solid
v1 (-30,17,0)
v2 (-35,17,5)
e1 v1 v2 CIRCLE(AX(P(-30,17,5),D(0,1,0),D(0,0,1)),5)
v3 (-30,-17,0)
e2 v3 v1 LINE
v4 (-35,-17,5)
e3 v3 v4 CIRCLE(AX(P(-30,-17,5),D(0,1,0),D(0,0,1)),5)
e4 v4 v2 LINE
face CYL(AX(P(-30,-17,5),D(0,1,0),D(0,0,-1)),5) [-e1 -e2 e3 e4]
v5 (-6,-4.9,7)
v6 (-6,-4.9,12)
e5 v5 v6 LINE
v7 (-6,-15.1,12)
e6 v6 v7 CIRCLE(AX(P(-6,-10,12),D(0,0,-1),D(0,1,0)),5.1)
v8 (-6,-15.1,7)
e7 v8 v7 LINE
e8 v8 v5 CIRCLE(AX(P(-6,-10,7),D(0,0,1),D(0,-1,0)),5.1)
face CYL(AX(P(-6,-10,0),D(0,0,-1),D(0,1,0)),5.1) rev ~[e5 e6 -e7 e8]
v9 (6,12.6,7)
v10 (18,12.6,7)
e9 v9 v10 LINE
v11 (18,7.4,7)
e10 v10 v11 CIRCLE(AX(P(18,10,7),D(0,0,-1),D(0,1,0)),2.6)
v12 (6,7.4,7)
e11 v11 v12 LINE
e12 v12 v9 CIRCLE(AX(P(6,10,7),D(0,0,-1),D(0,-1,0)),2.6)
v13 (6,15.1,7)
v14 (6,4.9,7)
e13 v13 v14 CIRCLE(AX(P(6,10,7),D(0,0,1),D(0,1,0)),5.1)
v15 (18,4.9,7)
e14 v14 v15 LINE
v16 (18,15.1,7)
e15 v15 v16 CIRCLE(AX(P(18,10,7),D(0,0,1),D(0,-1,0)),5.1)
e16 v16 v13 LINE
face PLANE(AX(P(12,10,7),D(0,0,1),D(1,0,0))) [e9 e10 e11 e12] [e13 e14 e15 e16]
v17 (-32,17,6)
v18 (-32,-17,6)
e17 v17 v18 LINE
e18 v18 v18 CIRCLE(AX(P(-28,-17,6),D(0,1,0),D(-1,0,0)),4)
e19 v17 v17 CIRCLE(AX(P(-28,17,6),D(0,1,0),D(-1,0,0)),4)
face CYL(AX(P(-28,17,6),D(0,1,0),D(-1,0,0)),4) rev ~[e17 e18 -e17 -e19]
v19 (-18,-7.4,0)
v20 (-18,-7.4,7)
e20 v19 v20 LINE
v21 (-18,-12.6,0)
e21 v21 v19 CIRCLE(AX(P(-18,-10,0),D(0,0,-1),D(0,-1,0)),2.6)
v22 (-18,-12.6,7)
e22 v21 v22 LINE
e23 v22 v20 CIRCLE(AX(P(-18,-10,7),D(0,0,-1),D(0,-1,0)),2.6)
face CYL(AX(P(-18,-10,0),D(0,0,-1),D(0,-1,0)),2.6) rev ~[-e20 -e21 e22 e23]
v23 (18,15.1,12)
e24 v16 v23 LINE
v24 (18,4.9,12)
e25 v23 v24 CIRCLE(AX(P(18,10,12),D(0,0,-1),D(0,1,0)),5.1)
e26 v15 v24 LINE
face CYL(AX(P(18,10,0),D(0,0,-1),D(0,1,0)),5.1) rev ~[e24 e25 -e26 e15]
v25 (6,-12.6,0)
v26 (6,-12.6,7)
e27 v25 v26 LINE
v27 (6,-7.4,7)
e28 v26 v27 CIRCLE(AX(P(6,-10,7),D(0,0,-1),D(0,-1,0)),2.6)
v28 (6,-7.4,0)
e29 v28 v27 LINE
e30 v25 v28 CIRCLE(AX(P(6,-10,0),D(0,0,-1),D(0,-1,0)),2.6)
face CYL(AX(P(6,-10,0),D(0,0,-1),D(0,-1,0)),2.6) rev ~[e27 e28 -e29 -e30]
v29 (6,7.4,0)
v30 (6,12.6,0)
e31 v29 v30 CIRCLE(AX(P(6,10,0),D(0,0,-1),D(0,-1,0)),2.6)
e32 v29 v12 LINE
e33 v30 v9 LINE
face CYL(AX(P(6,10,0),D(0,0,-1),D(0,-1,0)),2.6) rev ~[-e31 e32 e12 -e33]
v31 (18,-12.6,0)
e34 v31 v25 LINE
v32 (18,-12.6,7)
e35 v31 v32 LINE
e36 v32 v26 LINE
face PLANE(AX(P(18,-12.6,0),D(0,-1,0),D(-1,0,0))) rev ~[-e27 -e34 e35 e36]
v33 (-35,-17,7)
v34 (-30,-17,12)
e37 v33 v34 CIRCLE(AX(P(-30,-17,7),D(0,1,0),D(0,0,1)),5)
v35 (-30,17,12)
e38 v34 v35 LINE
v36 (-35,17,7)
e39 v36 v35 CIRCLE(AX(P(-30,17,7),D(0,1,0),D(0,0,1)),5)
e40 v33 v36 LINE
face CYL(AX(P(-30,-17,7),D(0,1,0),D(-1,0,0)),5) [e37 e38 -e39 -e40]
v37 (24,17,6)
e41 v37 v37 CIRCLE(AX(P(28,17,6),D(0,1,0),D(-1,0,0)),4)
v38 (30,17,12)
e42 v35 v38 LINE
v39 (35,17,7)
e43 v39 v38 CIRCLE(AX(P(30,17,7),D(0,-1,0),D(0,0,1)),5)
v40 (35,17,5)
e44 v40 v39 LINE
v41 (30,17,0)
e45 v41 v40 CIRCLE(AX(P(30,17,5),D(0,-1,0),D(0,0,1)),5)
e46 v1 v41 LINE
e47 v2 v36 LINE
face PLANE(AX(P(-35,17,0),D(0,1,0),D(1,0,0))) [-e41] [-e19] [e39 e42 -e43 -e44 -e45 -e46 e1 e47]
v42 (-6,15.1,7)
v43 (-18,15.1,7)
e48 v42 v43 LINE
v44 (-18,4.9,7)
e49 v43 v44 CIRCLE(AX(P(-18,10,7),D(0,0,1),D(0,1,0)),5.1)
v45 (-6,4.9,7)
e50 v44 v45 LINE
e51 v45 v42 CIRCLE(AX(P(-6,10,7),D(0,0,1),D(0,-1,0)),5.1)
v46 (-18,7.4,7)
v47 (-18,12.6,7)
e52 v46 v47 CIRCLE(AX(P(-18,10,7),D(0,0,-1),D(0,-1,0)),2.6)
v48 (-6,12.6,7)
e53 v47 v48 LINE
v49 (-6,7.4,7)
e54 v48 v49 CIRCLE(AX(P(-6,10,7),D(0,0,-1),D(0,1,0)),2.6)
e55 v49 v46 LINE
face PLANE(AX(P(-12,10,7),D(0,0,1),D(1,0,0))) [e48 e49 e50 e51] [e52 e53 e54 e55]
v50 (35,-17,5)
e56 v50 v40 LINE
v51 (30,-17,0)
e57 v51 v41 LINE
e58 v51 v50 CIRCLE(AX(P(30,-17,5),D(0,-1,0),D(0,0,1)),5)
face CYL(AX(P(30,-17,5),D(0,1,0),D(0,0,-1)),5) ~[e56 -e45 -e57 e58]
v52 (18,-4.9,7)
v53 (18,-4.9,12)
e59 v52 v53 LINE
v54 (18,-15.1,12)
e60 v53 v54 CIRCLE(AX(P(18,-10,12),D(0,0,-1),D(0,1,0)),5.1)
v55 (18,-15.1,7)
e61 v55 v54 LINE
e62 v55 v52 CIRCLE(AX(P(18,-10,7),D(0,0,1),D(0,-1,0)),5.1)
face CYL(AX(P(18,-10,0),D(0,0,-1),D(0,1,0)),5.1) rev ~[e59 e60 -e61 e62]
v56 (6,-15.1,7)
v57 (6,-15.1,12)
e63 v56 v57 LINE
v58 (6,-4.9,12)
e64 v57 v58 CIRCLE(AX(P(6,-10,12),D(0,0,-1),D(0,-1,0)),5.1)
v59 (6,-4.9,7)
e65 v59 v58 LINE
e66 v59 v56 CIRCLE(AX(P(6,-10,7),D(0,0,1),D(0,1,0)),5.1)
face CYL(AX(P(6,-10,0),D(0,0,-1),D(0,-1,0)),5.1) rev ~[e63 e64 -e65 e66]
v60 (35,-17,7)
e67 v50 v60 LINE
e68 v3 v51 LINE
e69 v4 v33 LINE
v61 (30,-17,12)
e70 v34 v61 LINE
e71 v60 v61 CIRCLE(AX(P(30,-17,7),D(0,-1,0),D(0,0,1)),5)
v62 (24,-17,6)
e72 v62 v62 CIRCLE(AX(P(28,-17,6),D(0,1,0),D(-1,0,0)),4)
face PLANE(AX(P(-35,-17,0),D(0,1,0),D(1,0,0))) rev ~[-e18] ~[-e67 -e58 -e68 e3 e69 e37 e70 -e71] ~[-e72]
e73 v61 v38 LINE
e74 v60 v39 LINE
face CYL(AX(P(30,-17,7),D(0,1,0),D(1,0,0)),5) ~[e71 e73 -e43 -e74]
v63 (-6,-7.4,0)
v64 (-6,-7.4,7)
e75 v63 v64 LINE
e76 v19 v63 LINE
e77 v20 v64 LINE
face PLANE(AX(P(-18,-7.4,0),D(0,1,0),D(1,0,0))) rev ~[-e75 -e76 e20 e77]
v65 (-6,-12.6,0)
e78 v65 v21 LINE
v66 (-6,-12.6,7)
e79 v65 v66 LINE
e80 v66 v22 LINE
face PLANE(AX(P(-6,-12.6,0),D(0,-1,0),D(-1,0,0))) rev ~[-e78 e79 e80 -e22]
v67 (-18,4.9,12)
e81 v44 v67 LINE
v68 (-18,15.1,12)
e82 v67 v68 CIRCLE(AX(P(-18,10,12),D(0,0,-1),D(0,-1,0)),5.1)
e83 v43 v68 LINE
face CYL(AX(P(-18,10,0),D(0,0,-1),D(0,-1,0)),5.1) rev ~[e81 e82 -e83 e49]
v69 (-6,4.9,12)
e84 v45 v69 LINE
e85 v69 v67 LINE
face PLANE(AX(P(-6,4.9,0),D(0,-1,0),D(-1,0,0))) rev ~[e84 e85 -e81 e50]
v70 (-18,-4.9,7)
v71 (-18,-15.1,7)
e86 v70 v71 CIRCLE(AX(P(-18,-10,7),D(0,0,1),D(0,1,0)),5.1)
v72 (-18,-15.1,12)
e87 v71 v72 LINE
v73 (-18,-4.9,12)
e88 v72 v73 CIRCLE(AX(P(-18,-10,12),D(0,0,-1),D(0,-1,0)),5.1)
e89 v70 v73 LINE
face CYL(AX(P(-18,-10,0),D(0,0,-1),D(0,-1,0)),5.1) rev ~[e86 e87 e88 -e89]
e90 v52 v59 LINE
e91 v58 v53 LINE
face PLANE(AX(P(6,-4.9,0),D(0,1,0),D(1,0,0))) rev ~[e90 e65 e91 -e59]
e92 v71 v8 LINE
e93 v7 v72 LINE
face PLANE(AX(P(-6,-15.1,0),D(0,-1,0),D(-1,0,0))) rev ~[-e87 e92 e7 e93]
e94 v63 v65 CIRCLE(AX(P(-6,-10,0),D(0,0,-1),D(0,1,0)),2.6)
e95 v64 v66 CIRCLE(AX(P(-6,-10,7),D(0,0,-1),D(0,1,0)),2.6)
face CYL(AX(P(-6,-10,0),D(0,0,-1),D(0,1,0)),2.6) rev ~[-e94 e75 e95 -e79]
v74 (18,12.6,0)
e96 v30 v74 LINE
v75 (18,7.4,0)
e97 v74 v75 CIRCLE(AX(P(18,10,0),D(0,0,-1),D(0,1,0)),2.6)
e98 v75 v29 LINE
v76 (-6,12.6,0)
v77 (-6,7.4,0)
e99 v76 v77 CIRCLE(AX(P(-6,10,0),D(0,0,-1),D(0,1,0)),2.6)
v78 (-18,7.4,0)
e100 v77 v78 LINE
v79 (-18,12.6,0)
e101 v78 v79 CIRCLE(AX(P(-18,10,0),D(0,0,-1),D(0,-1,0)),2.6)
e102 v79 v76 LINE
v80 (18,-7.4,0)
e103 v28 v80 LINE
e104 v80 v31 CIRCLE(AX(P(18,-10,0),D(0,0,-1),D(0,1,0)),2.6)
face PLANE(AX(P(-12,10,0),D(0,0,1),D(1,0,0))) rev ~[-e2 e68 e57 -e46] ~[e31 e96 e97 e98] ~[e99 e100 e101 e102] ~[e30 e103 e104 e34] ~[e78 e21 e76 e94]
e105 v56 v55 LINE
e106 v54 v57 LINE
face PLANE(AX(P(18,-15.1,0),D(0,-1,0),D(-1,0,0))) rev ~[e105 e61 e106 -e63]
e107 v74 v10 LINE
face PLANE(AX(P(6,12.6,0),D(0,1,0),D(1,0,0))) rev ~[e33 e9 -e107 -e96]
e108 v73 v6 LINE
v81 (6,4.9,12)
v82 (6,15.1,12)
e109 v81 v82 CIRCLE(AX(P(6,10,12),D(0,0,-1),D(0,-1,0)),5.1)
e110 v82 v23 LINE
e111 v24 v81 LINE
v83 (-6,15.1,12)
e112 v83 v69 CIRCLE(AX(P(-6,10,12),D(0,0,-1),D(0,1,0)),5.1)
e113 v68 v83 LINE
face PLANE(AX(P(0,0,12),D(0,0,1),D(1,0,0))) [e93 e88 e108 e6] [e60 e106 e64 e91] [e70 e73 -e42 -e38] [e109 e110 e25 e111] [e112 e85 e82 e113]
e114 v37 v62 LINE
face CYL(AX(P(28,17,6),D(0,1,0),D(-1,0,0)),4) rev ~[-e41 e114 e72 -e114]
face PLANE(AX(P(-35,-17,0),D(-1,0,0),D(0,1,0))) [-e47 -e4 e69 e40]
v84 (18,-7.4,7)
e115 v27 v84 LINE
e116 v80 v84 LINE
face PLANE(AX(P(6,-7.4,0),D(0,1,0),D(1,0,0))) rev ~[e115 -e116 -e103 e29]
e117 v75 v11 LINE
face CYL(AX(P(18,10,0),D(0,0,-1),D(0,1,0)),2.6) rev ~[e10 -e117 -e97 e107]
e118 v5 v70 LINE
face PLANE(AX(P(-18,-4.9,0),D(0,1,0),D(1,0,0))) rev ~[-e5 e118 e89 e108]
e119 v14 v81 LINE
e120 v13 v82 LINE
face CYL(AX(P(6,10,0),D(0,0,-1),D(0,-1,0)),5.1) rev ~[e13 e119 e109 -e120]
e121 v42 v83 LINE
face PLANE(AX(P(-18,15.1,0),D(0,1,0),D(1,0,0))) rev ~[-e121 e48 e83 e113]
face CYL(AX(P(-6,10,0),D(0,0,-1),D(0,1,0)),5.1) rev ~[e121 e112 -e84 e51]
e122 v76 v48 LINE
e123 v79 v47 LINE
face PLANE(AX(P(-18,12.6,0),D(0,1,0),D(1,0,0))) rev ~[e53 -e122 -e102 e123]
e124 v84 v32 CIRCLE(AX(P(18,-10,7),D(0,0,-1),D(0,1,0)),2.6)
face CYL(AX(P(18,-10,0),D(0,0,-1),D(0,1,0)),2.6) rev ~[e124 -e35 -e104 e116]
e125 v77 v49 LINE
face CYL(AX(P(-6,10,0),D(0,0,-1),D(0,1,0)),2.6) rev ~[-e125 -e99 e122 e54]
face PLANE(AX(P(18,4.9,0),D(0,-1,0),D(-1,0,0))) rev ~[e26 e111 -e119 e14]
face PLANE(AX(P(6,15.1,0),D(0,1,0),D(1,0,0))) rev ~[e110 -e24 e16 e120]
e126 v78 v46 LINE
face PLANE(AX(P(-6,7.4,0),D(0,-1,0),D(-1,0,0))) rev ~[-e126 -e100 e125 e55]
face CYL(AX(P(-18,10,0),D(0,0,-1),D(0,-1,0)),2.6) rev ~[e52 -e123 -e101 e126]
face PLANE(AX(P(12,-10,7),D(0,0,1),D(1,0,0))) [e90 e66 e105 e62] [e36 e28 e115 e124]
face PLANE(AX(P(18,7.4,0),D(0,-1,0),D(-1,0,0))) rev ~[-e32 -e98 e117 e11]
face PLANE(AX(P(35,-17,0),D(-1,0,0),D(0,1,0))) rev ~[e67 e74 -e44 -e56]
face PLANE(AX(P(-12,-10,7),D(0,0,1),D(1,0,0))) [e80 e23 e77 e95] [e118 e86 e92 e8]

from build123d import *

# Parameters (mm, degrees)
F0_W     = 70
F0_H     = 34
F1_DEPTH = 12
F2_DEPTH = 7
F3_R     = 4
F4_DEPTH = 34.001
F5_R     = 5


# Not quite as in the source:
# - a feature names something its author has since deleted; it is built from what else it names


with BuildPart() as f1:
    # F0 (on Top) → F1 (new body)
    with BuildSketch(Plane.XY):
        Rectangle(F0_W, F0_H)
        with BuildLine():
            Line((-6, -15.1), (-18, -15.1))
            ThreePointArc((-18, -15.1), (-23.1, -10), (-18, -4.9))
            Line((-18, -4.9), (-6, -4.9))
            ThreePointArc((-6, -4.9), (-0.9, -10), (-6, -15.1))
        make_face(mode=Mode.SUBTRACT)
        with BuildLine():
            ThreePointArc((6, -15.1), (0.9, -10), (6, -4.9))
            Line((6, -4.9), (18, -4.9))
            ThreePointArc((18, -4.9), (23.1, -10), (18, -15.1))
            Line((18, -15.1), (6, -15.1))
        make_face(mode=Mode.SUBTRACT)
        with BuildLine():
            Line((-18, 15.1), (-6, 15.1))
            ThreePointArc((-6, 15.1), (-0.9, 10), (-6, 4.9))
            Line((-6, 4.9), (-18, 4.9))
            ThreePointArc((-18, 4.9), (-23.1, 10), (-18, 15.1))
        make_face(mode=Mode.SUBTRACT)
        with BuildLine():
            ThreePointArc((6, 4.9), (0.9, 10), (6, 15.1))
            Line((6, 15.1), (18, 15.1))
            ThreePointArc((18, 15.1), (23.1, 10), (18, 4.9))
            Line((18, 4.9), (6, 4.9))
        make_face(mode=Mode.SUBTRACT)
    extrude(amount=F1_DEPTH)

    # F0 (on Top) → F2 (join)
    with BuildSketch(Plane.XY):
        with BuildLine():
            ThreePointArc((-6, 4.9), (-0.9, 10), (-6, 15.1))
            Line((-6, 15.1), (-18, 15.1))
            ThreePointArc((-18, 15.1), (-23.1, 10), (-18, 4.9))
            Line((-18, 4.9), (-6, 4.9))
        make_face()
        with BuildLine():
            Line((-18, 12.6), (-6, 12.6))
            ThreePointArc((-6, 12.6), (-3.4, 10), (-6, 7.4))
            Line((-6, 7.4), (-18, 7.4))
            ThreePointArc((-18, 7.4), (-20.6, 10), (-18, 12.6))
        make_face(mode=Mode.SUBTRACT)
        with BuildLine():
            Line((18, 15.1), (6, 15.1))
            ThreePointArc((6, 15.1), (0.9, 10), (6, 4.9))
            Line((6, 4.9), (18, 4.9))
            ThreePointArc((18, 4.9), (23.1, 10), (18, 15.1))
        make_face()
        with BuildLine():
            ThreePointArc((6, 7.4), (3.4, 10), (6, 12.6))
            Line((6, 12.6), (18, 12.6))
            ThreePointArc((18, 12.6), (20.6, 10), (18, 7.4))
            Line((18, 7.4), (6, 7.4))
        make_face(mode=Mode.SUBTRACT)
        with BuildLine():
            Line((18, -4.9), (6, -4.9))
            ThreePointArc((6, -4.9), (0.9, -10), (6, -15.1))
            Line((6, -15.1), (18, -15.1))
            ThreePointArc((18, -15.1), (23.1, -10), (18, -4.9))
        make_face()
        with BuildLine():
            Line((18, -12.6), (6, -12.6))
            ThreePointArc((6, -12.6), (3.4, -10), (6, -7.4))
            Line((6, -7.4), (18, -7.4))
            ThreePointArc((18, -7.4), (20.6, -10), (18, -12.6))
        make_face(mode=Mode.SUBTRACT)
        with BuildLine():
            ThreePointArc((-18, -4.9), (-23.1, -10), (-18, -15.1))
            Line((-18, -15.1), (-6, -15.1))
            ThreePointArc((-6, -15.1), (-0.9, -10), (-6, -4.9))
            Line((-6, -4.9), (-18, -4.9))
        make_face()
        with BuildLine():
            Line((-6, -12.6), (-18, -12.6))
            ThreePointArc((-18, -12.6), (-20.6, -10), (-18, -7.4))
            Line((-18, -7.4), (-6, -7.4))
            ThreePointArc((-6, -7.4), (-3.4, -10), (-6, -12.6))
        make_face(mode=Mode.SUBTRACT)
    extrude(amount=F2_DEPTH)

    # F3 (on face) → F4 (cut, through all)
    with BuildSketch(Plane(origin=(0, 17, 0), x_dir=(-1, 0, 0), z_dir=(0, 1, 0))):
        with Locations((28, 6)):
            Circle(F3_R)
        with Locations((-28, 6)):
            Circle(F3_R)
    extrude(amount=-F4_DEPTH, mode=Mode.SUBTRACT)

    # F5
    f5_edges = [f1.edges().sort_by_distance(p)[0] for p in [
        (-35, 0, 12),
        (35, 0, 12),
        (-35, 0, 0),
        (35, 0, 0),
    ]]
    fillet(f5_edges, radius=F5_R)


solid = f1.part
